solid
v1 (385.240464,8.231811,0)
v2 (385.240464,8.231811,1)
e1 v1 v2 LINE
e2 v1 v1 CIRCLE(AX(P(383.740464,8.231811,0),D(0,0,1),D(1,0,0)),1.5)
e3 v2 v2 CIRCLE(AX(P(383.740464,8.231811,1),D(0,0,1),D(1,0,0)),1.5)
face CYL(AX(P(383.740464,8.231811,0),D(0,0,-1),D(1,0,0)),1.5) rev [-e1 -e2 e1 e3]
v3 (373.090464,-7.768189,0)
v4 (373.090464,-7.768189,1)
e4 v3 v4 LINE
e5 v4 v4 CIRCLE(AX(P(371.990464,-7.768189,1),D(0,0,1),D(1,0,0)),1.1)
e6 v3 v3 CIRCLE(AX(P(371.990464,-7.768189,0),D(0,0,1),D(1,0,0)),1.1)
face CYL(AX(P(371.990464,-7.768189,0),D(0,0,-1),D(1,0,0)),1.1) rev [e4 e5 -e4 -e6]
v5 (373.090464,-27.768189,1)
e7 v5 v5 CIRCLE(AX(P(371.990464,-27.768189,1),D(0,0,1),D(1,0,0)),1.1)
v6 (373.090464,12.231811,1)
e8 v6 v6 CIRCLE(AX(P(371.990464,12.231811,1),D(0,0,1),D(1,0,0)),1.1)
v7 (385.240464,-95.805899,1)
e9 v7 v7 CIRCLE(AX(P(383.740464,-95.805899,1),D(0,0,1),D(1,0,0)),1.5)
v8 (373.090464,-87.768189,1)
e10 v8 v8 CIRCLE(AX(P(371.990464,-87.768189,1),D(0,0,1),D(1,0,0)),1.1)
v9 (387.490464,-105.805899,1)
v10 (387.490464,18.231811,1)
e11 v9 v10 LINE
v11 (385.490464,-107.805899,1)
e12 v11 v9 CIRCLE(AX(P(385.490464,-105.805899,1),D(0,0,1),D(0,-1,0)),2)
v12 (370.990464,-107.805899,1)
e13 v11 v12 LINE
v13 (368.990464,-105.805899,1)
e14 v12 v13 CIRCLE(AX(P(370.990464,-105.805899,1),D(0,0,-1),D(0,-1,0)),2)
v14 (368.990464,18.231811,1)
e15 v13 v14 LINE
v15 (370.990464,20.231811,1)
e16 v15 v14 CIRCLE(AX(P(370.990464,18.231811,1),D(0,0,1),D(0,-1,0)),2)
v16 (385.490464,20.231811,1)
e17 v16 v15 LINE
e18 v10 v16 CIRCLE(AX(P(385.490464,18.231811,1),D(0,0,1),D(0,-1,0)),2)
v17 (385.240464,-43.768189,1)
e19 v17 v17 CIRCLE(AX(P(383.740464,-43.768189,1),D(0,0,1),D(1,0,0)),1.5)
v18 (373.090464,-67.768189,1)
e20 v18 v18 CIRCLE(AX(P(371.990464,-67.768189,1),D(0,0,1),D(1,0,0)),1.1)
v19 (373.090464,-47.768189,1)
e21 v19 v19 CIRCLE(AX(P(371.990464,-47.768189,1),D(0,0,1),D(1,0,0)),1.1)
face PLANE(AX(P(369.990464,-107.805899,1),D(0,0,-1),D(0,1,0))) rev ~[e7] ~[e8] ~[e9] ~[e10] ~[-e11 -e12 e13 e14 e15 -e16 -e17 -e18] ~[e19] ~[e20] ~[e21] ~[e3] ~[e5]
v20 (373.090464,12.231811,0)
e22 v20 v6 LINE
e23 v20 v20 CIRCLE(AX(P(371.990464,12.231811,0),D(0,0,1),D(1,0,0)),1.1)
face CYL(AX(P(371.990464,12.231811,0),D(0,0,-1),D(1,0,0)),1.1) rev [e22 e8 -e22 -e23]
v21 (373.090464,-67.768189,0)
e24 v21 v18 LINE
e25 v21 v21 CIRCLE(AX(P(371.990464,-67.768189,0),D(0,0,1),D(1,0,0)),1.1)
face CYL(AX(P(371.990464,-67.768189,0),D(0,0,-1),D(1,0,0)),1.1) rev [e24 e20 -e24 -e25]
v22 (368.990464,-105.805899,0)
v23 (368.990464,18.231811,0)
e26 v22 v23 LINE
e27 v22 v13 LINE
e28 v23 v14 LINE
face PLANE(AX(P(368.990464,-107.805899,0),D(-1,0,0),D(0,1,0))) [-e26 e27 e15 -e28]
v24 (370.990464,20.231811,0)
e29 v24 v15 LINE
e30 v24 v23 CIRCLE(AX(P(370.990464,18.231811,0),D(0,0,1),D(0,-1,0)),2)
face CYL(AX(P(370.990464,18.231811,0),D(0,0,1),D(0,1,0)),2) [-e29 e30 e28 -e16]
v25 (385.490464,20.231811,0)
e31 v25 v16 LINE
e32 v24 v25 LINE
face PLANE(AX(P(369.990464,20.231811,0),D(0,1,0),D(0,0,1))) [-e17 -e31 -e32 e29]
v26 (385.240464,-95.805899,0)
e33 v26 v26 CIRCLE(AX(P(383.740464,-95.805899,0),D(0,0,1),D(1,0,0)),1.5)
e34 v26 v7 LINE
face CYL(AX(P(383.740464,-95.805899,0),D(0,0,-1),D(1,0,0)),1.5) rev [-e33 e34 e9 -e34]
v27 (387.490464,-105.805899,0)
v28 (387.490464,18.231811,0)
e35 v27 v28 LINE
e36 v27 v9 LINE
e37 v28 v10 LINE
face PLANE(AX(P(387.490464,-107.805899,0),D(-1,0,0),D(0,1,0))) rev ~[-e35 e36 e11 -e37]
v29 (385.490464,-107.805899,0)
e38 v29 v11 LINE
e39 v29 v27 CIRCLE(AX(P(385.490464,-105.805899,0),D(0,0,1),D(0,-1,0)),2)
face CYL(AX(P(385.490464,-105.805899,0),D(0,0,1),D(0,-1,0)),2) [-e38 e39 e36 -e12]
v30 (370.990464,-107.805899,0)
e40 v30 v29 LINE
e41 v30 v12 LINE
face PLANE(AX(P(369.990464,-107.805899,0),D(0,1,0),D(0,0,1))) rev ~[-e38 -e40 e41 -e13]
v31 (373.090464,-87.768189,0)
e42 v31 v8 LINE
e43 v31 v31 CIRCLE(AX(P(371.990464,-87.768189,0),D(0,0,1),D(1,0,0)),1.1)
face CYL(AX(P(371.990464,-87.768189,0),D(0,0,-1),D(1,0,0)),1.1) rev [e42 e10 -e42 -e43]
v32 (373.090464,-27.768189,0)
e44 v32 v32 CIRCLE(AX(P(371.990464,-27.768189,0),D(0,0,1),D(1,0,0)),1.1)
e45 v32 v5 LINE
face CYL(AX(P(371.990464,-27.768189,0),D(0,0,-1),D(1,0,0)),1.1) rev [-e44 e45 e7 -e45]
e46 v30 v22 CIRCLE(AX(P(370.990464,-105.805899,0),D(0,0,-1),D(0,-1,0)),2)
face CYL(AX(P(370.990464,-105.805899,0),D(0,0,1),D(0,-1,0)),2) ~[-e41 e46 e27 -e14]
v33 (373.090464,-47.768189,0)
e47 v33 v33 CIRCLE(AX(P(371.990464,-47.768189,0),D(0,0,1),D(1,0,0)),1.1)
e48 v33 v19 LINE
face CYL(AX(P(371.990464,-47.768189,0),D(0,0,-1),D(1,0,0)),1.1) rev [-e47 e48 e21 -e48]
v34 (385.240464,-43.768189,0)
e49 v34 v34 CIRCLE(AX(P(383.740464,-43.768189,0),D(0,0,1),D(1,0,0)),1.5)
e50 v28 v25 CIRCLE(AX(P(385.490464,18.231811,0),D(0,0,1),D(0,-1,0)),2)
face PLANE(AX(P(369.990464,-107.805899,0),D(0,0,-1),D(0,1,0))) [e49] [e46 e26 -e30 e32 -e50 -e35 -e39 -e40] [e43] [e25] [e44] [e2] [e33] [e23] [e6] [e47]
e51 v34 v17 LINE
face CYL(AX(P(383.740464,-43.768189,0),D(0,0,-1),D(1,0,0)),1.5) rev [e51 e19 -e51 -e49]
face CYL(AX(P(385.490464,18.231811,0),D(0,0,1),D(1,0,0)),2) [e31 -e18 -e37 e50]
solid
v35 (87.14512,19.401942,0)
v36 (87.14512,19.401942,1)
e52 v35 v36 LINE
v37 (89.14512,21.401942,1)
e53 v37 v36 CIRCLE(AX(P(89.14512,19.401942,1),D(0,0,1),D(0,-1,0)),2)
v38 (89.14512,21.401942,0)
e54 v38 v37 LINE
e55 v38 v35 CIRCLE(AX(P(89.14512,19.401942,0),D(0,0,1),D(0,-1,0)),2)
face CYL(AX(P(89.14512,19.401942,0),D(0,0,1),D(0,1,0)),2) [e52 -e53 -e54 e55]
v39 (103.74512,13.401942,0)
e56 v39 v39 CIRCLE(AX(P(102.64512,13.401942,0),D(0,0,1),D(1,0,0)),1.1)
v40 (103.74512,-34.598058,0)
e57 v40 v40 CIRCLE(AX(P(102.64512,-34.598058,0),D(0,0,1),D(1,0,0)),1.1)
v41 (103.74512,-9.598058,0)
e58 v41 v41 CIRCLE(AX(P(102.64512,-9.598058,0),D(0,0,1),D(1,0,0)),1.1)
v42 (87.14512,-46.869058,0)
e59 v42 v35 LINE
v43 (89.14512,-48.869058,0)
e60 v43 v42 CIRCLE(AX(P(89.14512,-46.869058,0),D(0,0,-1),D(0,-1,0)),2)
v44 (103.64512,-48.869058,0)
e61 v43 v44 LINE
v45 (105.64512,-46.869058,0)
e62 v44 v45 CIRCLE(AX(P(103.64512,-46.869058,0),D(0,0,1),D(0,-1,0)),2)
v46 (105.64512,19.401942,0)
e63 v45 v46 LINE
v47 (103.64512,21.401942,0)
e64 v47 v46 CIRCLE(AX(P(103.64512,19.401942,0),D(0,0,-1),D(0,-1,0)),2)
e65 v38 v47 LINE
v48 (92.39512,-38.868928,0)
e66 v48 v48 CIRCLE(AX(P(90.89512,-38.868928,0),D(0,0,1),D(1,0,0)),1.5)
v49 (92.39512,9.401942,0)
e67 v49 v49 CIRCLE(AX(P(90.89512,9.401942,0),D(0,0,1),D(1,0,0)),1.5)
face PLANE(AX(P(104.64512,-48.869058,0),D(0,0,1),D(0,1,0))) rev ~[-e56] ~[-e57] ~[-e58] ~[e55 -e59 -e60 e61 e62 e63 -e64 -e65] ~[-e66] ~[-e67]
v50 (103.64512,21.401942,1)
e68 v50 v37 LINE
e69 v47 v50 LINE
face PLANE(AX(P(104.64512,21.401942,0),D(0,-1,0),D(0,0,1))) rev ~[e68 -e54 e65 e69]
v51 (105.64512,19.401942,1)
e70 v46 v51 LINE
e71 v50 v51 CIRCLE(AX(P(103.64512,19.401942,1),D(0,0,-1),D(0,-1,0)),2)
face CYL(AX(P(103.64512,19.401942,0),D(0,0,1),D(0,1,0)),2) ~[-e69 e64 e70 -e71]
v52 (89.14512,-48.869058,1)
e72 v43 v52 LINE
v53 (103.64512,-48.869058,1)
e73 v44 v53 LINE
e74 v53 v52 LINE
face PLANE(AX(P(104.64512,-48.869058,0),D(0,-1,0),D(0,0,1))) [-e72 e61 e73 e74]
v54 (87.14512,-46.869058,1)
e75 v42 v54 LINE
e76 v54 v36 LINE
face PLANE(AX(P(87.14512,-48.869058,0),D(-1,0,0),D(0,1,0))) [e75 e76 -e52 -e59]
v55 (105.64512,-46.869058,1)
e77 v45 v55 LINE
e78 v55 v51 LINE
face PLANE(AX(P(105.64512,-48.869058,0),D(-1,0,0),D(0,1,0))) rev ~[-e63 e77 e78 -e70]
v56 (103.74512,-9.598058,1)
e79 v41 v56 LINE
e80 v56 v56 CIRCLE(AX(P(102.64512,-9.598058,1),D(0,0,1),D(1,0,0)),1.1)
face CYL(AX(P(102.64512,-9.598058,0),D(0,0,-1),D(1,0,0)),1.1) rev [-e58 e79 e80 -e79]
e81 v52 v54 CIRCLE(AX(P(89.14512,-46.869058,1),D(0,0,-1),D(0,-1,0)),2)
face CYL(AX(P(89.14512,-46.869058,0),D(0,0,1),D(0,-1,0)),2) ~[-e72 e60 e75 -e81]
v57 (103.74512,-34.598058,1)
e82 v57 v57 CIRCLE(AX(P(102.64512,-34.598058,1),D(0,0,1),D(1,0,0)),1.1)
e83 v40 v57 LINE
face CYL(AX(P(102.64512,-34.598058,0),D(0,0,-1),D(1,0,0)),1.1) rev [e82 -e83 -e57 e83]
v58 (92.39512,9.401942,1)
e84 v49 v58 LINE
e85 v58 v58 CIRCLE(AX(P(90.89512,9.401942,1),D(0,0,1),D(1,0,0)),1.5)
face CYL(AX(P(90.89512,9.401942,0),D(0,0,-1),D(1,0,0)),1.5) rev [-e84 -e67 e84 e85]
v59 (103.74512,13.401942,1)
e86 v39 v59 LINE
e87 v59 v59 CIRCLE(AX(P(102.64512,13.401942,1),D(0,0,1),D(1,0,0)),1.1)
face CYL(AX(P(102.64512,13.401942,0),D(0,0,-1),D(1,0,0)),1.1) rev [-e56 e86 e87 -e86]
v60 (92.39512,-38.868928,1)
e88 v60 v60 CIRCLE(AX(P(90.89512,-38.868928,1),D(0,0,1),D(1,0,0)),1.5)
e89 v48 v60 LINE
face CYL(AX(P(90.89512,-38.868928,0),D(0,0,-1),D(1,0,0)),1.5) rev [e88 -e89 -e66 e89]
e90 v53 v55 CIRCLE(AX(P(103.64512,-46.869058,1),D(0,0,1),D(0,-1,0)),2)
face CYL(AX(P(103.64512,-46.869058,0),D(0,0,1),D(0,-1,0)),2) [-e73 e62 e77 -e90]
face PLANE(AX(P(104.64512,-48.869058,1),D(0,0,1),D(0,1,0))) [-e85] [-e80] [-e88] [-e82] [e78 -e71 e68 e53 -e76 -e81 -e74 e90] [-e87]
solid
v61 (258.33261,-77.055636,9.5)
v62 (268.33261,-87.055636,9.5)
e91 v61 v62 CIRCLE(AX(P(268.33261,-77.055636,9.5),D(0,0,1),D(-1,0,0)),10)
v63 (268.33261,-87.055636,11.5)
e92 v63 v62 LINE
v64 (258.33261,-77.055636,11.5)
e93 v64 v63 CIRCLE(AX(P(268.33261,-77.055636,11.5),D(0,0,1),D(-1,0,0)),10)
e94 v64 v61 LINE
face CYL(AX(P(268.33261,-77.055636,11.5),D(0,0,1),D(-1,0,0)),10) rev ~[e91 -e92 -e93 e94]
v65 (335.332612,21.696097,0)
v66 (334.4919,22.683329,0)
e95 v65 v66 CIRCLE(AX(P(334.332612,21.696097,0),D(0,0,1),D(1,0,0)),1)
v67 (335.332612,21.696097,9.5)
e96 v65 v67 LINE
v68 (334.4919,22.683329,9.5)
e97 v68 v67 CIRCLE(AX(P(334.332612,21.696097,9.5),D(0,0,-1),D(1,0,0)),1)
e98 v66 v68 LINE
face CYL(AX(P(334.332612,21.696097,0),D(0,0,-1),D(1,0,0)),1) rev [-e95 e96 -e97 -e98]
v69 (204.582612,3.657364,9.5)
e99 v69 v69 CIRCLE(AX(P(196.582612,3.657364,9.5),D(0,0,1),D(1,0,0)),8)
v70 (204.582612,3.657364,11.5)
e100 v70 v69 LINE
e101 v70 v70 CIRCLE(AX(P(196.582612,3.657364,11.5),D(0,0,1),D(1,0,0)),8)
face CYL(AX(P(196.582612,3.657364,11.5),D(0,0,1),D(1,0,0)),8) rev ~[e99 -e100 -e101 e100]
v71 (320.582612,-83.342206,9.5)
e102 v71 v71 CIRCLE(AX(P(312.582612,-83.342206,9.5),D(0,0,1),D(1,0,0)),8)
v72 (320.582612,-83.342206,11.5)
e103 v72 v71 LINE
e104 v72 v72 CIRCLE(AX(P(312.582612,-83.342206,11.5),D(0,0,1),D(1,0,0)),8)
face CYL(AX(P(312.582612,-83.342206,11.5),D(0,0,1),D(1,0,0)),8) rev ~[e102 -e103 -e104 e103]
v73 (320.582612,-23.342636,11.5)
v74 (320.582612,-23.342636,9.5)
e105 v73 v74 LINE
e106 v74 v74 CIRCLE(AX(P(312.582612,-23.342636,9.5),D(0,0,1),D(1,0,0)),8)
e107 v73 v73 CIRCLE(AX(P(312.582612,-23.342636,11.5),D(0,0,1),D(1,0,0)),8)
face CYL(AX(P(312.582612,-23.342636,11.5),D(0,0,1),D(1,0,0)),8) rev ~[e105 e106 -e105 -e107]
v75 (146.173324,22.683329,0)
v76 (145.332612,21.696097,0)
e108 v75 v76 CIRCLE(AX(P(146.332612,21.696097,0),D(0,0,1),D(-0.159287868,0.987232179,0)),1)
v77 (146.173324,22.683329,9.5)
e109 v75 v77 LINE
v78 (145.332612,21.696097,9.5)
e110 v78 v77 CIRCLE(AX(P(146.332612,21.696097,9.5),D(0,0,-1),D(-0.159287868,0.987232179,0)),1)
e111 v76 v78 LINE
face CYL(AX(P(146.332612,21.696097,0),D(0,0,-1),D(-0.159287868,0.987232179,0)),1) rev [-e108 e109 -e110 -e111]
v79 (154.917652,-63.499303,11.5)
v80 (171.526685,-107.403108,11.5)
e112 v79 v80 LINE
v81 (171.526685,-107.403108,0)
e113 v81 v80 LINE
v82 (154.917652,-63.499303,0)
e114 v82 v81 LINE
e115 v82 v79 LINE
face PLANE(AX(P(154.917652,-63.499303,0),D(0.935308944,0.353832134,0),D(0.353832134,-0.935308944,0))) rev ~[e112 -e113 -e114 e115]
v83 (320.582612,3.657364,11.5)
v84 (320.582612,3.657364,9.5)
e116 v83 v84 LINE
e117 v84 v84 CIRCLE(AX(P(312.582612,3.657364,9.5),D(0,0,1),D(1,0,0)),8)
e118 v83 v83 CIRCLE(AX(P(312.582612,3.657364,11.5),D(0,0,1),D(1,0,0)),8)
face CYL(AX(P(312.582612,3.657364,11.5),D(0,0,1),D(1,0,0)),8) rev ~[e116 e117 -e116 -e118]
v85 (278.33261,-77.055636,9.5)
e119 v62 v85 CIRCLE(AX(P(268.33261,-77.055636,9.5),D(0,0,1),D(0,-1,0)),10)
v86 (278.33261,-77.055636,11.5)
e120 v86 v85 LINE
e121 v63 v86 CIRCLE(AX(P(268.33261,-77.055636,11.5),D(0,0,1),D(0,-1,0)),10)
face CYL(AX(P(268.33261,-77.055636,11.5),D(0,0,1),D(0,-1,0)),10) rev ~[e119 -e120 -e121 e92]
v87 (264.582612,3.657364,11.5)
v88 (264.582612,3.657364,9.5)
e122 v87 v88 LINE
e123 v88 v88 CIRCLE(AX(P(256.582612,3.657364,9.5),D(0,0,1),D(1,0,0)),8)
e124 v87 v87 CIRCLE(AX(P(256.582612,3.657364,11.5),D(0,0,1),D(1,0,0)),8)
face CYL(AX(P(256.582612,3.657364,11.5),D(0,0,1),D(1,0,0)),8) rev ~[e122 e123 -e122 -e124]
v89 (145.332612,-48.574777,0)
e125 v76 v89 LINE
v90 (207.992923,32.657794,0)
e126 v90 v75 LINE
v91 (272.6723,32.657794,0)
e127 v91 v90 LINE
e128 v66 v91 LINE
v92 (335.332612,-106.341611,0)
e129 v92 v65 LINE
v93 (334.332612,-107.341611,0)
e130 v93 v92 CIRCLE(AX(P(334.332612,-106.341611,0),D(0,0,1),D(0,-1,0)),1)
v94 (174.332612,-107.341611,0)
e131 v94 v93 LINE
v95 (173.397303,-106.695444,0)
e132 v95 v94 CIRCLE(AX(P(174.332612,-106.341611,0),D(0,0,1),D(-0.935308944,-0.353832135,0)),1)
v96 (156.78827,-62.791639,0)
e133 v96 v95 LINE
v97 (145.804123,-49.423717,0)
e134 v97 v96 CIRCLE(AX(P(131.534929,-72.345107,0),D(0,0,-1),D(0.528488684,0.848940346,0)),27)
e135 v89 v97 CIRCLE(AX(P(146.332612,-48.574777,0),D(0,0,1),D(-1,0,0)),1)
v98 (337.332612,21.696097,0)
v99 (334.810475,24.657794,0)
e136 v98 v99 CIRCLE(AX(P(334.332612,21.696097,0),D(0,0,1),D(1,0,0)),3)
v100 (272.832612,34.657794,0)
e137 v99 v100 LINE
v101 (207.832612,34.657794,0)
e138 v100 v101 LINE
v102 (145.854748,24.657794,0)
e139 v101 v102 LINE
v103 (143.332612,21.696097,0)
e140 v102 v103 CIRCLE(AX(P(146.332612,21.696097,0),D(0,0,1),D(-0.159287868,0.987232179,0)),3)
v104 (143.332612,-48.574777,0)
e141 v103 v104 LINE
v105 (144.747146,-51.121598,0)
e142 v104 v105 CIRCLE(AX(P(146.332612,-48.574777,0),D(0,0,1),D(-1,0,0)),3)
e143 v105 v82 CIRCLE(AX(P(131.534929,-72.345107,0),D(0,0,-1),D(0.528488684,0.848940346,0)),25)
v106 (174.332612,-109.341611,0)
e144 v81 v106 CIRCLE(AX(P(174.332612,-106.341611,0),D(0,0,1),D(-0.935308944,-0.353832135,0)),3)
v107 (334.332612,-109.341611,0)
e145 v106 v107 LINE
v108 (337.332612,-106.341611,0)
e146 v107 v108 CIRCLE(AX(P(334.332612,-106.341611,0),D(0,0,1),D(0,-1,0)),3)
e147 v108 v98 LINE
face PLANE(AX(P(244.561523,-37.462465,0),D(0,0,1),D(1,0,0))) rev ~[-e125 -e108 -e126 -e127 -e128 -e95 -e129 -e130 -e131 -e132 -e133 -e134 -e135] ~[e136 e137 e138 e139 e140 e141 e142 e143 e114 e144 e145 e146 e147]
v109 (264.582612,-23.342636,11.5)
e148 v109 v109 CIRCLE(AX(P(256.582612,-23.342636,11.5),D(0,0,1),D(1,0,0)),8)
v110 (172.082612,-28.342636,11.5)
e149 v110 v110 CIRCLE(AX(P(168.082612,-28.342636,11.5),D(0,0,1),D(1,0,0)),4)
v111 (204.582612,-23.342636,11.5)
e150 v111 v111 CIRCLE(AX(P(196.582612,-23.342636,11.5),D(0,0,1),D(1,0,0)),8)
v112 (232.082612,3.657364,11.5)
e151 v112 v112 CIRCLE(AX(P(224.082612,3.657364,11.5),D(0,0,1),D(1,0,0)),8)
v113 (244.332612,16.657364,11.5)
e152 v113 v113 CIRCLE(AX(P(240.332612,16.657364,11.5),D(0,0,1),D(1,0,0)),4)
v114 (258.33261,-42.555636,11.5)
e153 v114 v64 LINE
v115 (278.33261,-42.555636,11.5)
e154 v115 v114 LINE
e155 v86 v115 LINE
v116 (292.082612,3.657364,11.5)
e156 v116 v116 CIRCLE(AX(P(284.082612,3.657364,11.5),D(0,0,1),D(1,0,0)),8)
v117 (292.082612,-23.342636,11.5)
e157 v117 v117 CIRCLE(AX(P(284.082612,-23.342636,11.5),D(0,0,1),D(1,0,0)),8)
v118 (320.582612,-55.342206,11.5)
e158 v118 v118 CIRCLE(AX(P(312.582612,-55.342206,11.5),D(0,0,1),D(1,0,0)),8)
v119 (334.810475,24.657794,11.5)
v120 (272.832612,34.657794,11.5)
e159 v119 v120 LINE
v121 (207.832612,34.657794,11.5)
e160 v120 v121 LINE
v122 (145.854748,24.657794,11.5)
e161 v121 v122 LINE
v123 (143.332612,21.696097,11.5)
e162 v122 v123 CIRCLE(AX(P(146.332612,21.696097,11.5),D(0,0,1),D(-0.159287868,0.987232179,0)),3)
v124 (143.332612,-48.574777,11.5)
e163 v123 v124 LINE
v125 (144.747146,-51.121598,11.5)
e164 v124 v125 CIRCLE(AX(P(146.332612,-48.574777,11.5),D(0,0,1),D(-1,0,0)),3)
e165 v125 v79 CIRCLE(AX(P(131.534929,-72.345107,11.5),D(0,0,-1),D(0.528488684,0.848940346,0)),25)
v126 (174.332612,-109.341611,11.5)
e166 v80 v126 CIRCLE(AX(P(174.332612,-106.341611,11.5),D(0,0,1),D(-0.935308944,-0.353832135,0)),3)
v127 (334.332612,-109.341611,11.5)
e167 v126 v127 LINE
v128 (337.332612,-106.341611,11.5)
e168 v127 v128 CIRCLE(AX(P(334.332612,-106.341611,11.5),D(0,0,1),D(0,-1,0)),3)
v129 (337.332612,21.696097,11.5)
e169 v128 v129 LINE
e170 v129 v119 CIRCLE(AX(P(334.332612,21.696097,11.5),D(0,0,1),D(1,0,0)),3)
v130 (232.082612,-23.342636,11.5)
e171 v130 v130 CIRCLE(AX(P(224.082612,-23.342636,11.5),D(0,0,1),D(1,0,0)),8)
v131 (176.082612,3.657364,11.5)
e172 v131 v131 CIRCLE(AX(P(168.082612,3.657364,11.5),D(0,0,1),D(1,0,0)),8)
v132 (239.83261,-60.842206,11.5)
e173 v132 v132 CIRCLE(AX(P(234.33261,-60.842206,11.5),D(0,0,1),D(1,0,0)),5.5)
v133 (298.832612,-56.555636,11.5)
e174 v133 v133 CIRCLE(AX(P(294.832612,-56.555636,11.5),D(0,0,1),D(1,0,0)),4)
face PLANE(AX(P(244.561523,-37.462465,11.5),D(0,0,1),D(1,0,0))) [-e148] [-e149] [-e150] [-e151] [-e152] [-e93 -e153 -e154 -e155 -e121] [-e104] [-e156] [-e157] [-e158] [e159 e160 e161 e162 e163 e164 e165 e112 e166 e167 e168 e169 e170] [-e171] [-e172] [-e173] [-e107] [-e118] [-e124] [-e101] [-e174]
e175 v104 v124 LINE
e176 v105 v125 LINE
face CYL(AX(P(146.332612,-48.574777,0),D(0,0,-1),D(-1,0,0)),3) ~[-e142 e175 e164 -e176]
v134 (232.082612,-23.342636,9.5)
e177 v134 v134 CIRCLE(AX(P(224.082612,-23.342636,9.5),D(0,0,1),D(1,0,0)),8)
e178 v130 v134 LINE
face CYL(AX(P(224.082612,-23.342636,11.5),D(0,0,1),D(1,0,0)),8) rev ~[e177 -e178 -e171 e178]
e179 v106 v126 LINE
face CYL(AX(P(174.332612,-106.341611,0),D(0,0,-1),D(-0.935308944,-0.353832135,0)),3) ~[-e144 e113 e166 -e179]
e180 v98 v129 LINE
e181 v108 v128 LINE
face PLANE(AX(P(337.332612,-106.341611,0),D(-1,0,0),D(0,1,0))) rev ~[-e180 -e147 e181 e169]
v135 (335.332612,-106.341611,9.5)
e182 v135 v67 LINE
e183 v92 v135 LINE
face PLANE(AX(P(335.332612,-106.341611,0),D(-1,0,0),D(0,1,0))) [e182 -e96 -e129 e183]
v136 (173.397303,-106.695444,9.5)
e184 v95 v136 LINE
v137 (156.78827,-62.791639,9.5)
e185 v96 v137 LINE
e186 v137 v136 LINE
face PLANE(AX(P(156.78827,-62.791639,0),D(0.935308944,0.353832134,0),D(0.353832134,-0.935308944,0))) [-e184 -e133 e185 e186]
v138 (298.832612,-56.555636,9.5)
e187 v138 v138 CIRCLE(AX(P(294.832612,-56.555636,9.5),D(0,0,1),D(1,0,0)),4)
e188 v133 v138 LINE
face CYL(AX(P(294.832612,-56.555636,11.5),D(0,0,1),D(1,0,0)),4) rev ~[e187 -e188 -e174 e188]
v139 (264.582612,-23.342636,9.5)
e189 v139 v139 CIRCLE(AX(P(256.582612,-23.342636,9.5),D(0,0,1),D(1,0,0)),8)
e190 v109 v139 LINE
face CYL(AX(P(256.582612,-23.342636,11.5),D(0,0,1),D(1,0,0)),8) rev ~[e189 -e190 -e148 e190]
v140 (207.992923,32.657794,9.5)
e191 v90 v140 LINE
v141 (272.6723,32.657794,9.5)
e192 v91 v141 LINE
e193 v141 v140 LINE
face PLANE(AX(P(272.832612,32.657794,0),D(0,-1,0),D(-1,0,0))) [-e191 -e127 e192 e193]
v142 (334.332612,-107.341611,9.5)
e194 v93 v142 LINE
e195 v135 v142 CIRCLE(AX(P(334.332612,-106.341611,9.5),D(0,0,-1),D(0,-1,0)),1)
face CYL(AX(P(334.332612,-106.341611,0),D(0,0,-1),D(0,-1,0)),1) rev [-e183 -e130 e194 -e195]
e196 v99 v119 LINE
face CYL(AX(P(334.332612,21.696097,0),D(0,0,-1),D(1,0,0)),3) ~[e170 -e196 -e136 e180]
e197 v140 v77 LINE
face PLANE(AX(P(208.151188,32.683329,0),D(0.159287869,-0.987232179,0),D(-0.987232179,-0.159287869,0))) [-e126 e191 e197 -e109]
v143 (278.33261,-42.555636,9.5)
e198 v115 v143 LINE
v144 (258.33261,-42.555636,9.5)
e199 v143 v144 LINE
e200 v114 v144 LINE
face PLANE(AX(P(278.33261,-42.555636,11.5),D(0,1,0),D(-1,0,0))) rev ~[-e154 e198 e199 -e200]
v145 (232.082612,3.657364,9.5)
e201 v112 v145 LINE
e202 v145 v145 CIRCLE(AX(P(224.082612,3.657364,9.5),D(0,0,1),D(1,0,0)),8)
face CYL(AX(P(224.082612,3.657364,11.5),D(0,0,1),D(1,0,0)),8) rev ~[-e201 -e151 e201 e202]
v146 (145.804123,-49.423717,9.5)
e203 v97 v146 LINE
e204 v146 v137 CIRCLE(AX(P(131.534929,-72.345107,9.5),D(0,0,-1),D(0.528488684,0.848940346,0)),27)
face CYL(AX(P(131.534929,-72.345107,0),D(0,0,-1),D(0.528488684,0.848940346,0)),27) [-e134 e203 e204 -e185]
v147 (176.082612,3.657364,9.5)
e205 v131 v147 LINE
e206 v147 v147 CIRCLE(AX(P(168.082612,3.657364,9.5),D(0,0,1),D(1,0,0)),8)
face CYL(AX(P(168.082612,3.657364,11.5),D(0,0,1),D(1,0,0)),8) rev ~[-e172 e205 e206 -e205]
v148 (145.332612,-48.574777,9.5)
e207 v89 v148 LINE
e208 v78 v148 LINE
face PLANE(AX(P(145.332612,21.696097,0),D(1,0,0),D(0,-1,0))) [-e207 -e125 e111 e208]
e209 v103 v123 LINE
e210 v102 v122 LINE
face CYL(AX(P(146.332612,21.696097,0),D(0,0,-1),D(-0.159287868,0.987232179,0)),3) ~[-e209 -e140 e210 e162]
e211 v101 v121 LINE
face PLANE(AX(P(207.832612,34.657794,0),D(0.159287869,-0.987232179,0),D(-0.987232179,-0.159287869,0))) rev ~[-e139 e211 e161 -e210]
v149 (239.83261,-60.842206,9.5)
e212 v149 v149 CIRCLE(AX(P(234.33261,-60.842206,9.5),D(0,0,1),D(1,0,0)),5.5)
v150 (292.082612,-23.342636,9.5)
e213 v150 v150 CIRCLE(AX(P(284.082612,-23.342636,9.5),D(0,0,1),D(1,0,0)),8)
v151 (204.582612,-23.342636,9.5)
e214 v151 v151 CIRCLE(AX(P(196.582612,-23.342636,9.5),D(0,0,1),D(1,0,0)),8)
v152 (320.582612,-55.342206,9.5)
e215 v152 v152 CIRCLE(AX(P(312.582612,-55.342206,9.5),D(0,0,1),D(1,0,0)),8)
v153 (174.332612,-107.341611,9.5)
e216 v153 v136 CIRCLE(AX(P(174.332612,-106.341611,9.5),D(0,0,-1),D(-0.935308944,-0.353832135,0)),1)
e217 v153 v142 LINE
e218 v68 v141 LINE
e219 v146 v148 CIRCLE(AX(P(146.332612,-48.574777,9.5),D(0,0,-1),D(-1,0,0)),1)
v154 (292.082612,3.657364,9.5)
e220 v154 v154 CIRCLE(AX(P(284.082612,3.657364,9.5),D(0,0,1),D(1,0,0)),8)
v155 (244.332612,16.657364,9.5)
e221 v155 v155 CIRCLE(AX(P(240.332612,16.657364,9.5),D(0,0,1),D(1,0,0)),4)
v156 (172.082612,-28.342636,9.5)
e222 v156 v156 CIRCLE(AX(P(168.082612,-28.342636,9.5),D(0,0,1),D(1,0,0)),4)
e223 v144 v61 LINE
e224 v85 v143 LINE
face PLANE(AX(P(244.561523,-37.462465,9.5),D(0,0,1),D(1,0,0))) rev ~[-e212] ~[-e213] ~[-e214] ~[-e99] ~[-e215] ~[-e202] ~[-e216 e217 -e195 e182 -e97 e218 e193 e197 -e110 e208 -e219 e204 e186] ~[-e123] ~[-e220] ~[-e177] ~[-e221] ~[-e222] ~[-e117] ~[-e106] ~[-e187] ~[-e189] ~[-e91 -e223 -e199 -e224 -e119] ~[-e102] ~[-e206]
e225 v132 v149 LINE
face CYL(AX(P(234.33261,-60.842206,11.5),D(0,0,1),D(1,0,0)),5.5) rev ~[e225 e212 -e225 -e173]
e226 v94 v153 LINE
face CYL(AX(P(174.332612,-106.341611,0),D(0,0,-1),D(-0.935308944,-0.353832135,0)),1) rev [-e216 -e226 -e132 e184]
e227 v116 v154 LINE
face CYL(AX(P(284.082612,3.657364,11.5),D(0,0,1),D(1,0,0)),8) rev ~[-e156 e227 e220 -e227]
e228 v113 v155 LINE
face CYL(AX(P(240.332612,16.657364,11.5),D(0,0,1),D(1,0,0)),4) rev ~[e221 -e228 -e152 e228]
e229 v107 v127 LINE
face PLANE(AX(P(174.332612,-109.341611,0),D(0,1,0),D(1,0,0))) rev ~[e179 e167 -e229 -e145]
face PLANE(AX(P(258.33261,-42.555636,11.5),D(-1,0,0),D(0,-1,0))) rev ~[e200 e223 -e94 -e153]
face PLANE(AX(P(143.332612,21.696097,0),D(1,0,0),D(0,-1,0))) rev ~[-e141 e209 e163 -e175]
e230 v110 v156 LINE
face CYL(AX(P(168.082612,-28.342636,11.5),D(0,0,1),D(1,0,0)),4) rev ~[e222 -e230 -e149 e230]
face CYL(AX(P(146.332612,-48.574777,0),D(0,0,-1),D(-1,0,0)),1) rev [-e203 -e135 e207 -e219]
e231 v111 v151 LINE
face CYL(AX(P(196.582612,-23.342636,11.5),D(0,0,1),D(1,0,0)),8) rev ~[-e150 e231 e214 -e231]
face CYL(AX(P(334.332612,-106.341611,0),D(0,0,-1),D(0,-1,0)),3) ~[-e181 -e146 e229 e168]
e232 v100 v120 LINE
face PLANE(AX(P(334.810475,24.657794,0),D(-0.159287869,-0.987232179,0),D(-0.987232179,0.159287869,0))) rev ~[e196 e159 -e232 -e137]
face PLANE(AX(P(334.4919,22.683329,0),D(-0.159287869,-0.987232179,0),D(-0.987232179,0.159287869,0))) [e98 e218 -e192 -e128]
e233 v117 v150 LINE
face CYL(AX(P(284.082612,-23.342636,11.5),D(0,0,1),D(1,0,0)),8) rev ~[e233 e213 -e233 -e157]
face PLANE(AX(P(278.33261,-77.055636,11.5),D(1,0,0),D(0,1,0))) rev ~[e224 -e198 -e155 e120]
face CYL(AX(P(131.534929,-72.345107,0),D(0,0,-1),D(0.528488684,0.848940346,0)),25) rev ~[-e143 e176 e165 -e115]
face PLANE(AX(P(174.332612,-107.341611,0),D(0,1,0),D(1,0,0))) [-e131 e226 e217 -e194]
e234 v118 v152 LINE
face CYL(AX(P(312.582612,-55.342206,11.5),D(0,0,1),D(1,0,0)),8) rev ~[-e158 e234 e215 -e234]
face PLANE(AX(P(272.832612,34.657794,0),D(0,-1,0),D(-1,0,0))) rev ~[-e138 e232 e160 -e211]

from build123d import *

# Parameters (mm, degrees)
F1_DEPTH  = 11.5
F2_T      = -2
F3_R      = 8
F3_R_2    = 5.5
F3_R_3    = 4
F4_DEPTH  = 5
F5_W      = 17.5
F5_H      = 70.271
F5_R      = 1.5
F5_R_2    = 1.1
F6_DEPTH  = 1
F7_W      = 17.5
F7_H      = 128.03771
F7_R      = 1.1
F7_R_2    = 1.5
F8_DEPTH  = 1
F9_DEPTH  = 1
F10_DEPTH = 1
F11_R     = 2
F11_2_R   = 2


# Not quite as in the source:
# - a feature names something its author has since deleted; it is built from what else it names


with BuildPart() as f1:
    # F0 (on Top) → F1 (new body)
    with BuildSketch(Plane.XY):
        with BuildLine():
            ThreePointArc((171.5266849444, -107.4031078396), (172.6273975977, -108.8098587101), (174.3326117763, -109.3416114362))
            Line((174.3326117763, -109.3416114362), (334.3326117763, -109.3416114362))
            ThreePointArc((334.3326117763, -109.3416114362), (336.4539321198, -108.4629317798), (337.3326117763, -106.3416114362))
            Line((337.3326117763, -106.3416114362), (337.3326117763, 21.6960972542))
            ThreePointArc((337.3326117763, 21.6960972542), (336.6166422945, 23.6411434212), (334.8104753818, 24.6577937907))
            Line((334.8104753818, 24.6577937907), (272.8326117763, 34.6577937907))
            Line((272.8326117763, 34.6577937907), (207.8326117763, 34.6577937907))
            Line((207.8326117763, 34.6577937907), (145.8547481708, 24.6577937907))
            ThreePointArc((145.8547481708, 24.6577937907), (144.048581258, 23.6411434212), (143.3326117763, 21.6960972542))
            Line((143.3326117763, 21.6960972542), (143.3326117763, -48.5747770261))
            ThreePointArc((143.3326117763, -48.5747770261), (143.7099796866, -50.0314173119), (144.7471457245, -51.1215980639))
            ThreePointArc((144.7471457245, -51.1215980639), (150.8507076214, -56.4737273832), (154.9176522246, -63.4993033507))
            Line((154.9176522246, -63.4993033507), (171.5266849444, -107.4031078396))
        make_face()
    extrude(amount=F1_DEPTH)

    # F2
    f2_openings = [f1.faces().sort_by_distance(p)[0] for p in [
        (243.718427, -37.163876, 0),
    ]]
    offset(amount=F2_T, openings=f2_openings)

    # F3 (on face) → F4 (cut)
    with BuildSketch(Plane.XY.offset(11.5)):
        with Locations((168.0826117763, 3.6573637907)):
            Circle(F3_R)
        with Locations((196.5826117763, 3.6573637907)):
            Circle(F3_R)
        with Locations((224.0826117763, 3.6573637907)):
            Circle(F3_R)
        with Locations((256.5826117763, 3.6573637907)):
            Circle(F3_R)
        with Locations((284.0826117763, 3.6573637907)):
            Circle(F3_R)
        with Locations((312.5826117763, 3.6573637907)):
            Circle(F3_R)
        with BuildLine():
            Line((278.3326103382, -42.5556362093), (258.3326103382, -42.5556362093))
            Line((258.3326103382, -42.5556362093), (258.3326103382, -77.0556362093))
            ThreePointArc((258.3326103382, -77.0556362093), (261.2615425264, -84.1267040211), (268.3326103382, -87.0556362093))
            ThreePointArc((268.3326103382, -87.0556362093), (275.4036781501, -84.1267040211), (278.3326103382, -77.0556362093))
            Line((278.3326103382, -77.0556362093), (278.3326103382, -42.5556362093))
        make_face()
        with Locations((312.5826117763, -55.3422062093)):
            Circle(F3_R)
        with Locations((312.5826117763, -83.3422062093)):
            Circle(F3_R)
        with Locations((234.3326103382, -60.8422062093)):
            Circle(F3_R_2)
        with Locations((294.8326117763, -56.5556362093)):
            Circle(F3_R_3)
        with Locations((240.3326117763, 16.6573637907)):
            Circle(F3_R_3)
        with Locations((168.0826117763, -28.3426362093)):
            Circle(F3_R_3)
        with Locations((196.5826117763, -23.3426362093)):
            Circle(F3_R)
        with Locations((224.0826117763, -23.3426362093)):
            Circle(F3_R)
        with Locations((256.5826117763, -23.3426362093)):
            Circle(F3_R)
        with Locations((284.0826117763, -23.3426362093)):
            Circle(F3_R)
        with Locations((312.5826117763, -23.3426362093)):
            Circle(F3_R)
    extrude(amount=-F4_DEPTH, mode=Mode.SUBTRACT)


with BuildPart() as f6:
    # F5 (on Top) → F6 (new body)
    with BuildSketch(Plane.XY):
        with Locations((95.8951199055, -13.7335582237)):
            Rectangle(F5_W, F5_H)
        with Locations((90.8951199055, -38.8689282237)):
            Circle(F5_R, mode=Mode.SUBTRACT)
        with Locations((102.6451199055, -34.5980582237)):
            Circle(F5_R_2, mode=Mode.SUBTRACT)
        with Locations((90.8951199055, 9.4019417763)):
            Circle(F5_R, mode=Mode.SUBTRACT)
        with Locations((102.6451199055, -9.5980582237)):
            Circle(F5_R_2, mode=Mode.SUBTRACT)
        with Locations((102.6451199055, 13.4019417763)):
            Circle(F5_R_2, mode=Mode.SUBTRACT)
    extrude(amount=F6_DEPTH)

    # F10 (add): a face of the model
    f10_faces = [f6.faces().sort_by_distance(p)[0] for p in [
        (104.6451199055, -13.7335582237, 0.5),
    ]]
    extrude(f10_faces, amount=F10_DEPTH)

    # F11#2
    f11_2_edges = [f6.edges().sort_by_distance(p)[0] for p in [
        (105.64512, -48.869058, 0.5),
        (87.14512, -48.869058, 0.5),
        (105.64512, 21.401942, 0.5),
        (87.14512, 21.401942, 0.5),
    ]]
    fillet(f11_2_edges, radius=F11_2_R)


with BuildPart() as f8:
    # F7 (on Top) → F8 (new body)
    with BuildSketch(Plane.XY):
        with Locations((378.7404644489, -43.7870440428)):
            Rectangle(F7_W, F7_H)
        with Locations((371.9904644489, -87.7681890428)):
            Circle(F7_R, mode=Mode.SUBTRACT)
        with Locations((371.9904644489, -67.7681890428)):
            Circle(F7_R, mode=Mode.SUBTRACT)
        with Locations((371.9904644489, -47.7681890428)):
            Circle(F7_R, mode=Mode.SUBTRACT)
        with Locations((383.7404644489, -95.8058990428)):
            Circle(F7_R_2, mode=Mode.SUBTRACT)
        with Locations((371.9904644489, -27.7681890428)):
            Circle(F7_R, mode=Mode.SUBTRACT)
        with Locations((371.9904644489, -7.7681890428)):
            Circle(F7_R, mode=Mode.SUBTRACT)
        with Locations((371.9904644489, 12.2318109572)):
            Circle(F7_R, mode=Mode.SUBTRACT)
        with Locations((383.7404644489, -43.7681890428)):
            Circle(F7_R_2, mode=Mode.SUBTRACT)
        with Locations((383.7404644489, 8.2318109572)):
            Circle(F7_R_2, mode=Mode.SUBTRACT)
    extrude(amount=F8_DEPTH)

    # F9 (add): a face of the model
    f9_faces = [f8.faces().sort_by_distance(p)[0] for p in [
        (369.9904644489, -43.7870440428, 0.5),
    ]]
    extrude(f9_faces, amount=F9_DEPTH)

    # F11
    f11_edges = [f8.edges().sort_by_distance(p)[0] for p in [
        (387.490464, 20.231811, 0.5),
        (368.990464, 20.231811, 0.5),
        (387.490464, -107.805899, 0.5),
        (368.990464, -107.805899, 0.5),
    ]]
    fillet(f11_edges, radius=F11_R)


solid = Compound([f1.part, f6.part, f8.part])
